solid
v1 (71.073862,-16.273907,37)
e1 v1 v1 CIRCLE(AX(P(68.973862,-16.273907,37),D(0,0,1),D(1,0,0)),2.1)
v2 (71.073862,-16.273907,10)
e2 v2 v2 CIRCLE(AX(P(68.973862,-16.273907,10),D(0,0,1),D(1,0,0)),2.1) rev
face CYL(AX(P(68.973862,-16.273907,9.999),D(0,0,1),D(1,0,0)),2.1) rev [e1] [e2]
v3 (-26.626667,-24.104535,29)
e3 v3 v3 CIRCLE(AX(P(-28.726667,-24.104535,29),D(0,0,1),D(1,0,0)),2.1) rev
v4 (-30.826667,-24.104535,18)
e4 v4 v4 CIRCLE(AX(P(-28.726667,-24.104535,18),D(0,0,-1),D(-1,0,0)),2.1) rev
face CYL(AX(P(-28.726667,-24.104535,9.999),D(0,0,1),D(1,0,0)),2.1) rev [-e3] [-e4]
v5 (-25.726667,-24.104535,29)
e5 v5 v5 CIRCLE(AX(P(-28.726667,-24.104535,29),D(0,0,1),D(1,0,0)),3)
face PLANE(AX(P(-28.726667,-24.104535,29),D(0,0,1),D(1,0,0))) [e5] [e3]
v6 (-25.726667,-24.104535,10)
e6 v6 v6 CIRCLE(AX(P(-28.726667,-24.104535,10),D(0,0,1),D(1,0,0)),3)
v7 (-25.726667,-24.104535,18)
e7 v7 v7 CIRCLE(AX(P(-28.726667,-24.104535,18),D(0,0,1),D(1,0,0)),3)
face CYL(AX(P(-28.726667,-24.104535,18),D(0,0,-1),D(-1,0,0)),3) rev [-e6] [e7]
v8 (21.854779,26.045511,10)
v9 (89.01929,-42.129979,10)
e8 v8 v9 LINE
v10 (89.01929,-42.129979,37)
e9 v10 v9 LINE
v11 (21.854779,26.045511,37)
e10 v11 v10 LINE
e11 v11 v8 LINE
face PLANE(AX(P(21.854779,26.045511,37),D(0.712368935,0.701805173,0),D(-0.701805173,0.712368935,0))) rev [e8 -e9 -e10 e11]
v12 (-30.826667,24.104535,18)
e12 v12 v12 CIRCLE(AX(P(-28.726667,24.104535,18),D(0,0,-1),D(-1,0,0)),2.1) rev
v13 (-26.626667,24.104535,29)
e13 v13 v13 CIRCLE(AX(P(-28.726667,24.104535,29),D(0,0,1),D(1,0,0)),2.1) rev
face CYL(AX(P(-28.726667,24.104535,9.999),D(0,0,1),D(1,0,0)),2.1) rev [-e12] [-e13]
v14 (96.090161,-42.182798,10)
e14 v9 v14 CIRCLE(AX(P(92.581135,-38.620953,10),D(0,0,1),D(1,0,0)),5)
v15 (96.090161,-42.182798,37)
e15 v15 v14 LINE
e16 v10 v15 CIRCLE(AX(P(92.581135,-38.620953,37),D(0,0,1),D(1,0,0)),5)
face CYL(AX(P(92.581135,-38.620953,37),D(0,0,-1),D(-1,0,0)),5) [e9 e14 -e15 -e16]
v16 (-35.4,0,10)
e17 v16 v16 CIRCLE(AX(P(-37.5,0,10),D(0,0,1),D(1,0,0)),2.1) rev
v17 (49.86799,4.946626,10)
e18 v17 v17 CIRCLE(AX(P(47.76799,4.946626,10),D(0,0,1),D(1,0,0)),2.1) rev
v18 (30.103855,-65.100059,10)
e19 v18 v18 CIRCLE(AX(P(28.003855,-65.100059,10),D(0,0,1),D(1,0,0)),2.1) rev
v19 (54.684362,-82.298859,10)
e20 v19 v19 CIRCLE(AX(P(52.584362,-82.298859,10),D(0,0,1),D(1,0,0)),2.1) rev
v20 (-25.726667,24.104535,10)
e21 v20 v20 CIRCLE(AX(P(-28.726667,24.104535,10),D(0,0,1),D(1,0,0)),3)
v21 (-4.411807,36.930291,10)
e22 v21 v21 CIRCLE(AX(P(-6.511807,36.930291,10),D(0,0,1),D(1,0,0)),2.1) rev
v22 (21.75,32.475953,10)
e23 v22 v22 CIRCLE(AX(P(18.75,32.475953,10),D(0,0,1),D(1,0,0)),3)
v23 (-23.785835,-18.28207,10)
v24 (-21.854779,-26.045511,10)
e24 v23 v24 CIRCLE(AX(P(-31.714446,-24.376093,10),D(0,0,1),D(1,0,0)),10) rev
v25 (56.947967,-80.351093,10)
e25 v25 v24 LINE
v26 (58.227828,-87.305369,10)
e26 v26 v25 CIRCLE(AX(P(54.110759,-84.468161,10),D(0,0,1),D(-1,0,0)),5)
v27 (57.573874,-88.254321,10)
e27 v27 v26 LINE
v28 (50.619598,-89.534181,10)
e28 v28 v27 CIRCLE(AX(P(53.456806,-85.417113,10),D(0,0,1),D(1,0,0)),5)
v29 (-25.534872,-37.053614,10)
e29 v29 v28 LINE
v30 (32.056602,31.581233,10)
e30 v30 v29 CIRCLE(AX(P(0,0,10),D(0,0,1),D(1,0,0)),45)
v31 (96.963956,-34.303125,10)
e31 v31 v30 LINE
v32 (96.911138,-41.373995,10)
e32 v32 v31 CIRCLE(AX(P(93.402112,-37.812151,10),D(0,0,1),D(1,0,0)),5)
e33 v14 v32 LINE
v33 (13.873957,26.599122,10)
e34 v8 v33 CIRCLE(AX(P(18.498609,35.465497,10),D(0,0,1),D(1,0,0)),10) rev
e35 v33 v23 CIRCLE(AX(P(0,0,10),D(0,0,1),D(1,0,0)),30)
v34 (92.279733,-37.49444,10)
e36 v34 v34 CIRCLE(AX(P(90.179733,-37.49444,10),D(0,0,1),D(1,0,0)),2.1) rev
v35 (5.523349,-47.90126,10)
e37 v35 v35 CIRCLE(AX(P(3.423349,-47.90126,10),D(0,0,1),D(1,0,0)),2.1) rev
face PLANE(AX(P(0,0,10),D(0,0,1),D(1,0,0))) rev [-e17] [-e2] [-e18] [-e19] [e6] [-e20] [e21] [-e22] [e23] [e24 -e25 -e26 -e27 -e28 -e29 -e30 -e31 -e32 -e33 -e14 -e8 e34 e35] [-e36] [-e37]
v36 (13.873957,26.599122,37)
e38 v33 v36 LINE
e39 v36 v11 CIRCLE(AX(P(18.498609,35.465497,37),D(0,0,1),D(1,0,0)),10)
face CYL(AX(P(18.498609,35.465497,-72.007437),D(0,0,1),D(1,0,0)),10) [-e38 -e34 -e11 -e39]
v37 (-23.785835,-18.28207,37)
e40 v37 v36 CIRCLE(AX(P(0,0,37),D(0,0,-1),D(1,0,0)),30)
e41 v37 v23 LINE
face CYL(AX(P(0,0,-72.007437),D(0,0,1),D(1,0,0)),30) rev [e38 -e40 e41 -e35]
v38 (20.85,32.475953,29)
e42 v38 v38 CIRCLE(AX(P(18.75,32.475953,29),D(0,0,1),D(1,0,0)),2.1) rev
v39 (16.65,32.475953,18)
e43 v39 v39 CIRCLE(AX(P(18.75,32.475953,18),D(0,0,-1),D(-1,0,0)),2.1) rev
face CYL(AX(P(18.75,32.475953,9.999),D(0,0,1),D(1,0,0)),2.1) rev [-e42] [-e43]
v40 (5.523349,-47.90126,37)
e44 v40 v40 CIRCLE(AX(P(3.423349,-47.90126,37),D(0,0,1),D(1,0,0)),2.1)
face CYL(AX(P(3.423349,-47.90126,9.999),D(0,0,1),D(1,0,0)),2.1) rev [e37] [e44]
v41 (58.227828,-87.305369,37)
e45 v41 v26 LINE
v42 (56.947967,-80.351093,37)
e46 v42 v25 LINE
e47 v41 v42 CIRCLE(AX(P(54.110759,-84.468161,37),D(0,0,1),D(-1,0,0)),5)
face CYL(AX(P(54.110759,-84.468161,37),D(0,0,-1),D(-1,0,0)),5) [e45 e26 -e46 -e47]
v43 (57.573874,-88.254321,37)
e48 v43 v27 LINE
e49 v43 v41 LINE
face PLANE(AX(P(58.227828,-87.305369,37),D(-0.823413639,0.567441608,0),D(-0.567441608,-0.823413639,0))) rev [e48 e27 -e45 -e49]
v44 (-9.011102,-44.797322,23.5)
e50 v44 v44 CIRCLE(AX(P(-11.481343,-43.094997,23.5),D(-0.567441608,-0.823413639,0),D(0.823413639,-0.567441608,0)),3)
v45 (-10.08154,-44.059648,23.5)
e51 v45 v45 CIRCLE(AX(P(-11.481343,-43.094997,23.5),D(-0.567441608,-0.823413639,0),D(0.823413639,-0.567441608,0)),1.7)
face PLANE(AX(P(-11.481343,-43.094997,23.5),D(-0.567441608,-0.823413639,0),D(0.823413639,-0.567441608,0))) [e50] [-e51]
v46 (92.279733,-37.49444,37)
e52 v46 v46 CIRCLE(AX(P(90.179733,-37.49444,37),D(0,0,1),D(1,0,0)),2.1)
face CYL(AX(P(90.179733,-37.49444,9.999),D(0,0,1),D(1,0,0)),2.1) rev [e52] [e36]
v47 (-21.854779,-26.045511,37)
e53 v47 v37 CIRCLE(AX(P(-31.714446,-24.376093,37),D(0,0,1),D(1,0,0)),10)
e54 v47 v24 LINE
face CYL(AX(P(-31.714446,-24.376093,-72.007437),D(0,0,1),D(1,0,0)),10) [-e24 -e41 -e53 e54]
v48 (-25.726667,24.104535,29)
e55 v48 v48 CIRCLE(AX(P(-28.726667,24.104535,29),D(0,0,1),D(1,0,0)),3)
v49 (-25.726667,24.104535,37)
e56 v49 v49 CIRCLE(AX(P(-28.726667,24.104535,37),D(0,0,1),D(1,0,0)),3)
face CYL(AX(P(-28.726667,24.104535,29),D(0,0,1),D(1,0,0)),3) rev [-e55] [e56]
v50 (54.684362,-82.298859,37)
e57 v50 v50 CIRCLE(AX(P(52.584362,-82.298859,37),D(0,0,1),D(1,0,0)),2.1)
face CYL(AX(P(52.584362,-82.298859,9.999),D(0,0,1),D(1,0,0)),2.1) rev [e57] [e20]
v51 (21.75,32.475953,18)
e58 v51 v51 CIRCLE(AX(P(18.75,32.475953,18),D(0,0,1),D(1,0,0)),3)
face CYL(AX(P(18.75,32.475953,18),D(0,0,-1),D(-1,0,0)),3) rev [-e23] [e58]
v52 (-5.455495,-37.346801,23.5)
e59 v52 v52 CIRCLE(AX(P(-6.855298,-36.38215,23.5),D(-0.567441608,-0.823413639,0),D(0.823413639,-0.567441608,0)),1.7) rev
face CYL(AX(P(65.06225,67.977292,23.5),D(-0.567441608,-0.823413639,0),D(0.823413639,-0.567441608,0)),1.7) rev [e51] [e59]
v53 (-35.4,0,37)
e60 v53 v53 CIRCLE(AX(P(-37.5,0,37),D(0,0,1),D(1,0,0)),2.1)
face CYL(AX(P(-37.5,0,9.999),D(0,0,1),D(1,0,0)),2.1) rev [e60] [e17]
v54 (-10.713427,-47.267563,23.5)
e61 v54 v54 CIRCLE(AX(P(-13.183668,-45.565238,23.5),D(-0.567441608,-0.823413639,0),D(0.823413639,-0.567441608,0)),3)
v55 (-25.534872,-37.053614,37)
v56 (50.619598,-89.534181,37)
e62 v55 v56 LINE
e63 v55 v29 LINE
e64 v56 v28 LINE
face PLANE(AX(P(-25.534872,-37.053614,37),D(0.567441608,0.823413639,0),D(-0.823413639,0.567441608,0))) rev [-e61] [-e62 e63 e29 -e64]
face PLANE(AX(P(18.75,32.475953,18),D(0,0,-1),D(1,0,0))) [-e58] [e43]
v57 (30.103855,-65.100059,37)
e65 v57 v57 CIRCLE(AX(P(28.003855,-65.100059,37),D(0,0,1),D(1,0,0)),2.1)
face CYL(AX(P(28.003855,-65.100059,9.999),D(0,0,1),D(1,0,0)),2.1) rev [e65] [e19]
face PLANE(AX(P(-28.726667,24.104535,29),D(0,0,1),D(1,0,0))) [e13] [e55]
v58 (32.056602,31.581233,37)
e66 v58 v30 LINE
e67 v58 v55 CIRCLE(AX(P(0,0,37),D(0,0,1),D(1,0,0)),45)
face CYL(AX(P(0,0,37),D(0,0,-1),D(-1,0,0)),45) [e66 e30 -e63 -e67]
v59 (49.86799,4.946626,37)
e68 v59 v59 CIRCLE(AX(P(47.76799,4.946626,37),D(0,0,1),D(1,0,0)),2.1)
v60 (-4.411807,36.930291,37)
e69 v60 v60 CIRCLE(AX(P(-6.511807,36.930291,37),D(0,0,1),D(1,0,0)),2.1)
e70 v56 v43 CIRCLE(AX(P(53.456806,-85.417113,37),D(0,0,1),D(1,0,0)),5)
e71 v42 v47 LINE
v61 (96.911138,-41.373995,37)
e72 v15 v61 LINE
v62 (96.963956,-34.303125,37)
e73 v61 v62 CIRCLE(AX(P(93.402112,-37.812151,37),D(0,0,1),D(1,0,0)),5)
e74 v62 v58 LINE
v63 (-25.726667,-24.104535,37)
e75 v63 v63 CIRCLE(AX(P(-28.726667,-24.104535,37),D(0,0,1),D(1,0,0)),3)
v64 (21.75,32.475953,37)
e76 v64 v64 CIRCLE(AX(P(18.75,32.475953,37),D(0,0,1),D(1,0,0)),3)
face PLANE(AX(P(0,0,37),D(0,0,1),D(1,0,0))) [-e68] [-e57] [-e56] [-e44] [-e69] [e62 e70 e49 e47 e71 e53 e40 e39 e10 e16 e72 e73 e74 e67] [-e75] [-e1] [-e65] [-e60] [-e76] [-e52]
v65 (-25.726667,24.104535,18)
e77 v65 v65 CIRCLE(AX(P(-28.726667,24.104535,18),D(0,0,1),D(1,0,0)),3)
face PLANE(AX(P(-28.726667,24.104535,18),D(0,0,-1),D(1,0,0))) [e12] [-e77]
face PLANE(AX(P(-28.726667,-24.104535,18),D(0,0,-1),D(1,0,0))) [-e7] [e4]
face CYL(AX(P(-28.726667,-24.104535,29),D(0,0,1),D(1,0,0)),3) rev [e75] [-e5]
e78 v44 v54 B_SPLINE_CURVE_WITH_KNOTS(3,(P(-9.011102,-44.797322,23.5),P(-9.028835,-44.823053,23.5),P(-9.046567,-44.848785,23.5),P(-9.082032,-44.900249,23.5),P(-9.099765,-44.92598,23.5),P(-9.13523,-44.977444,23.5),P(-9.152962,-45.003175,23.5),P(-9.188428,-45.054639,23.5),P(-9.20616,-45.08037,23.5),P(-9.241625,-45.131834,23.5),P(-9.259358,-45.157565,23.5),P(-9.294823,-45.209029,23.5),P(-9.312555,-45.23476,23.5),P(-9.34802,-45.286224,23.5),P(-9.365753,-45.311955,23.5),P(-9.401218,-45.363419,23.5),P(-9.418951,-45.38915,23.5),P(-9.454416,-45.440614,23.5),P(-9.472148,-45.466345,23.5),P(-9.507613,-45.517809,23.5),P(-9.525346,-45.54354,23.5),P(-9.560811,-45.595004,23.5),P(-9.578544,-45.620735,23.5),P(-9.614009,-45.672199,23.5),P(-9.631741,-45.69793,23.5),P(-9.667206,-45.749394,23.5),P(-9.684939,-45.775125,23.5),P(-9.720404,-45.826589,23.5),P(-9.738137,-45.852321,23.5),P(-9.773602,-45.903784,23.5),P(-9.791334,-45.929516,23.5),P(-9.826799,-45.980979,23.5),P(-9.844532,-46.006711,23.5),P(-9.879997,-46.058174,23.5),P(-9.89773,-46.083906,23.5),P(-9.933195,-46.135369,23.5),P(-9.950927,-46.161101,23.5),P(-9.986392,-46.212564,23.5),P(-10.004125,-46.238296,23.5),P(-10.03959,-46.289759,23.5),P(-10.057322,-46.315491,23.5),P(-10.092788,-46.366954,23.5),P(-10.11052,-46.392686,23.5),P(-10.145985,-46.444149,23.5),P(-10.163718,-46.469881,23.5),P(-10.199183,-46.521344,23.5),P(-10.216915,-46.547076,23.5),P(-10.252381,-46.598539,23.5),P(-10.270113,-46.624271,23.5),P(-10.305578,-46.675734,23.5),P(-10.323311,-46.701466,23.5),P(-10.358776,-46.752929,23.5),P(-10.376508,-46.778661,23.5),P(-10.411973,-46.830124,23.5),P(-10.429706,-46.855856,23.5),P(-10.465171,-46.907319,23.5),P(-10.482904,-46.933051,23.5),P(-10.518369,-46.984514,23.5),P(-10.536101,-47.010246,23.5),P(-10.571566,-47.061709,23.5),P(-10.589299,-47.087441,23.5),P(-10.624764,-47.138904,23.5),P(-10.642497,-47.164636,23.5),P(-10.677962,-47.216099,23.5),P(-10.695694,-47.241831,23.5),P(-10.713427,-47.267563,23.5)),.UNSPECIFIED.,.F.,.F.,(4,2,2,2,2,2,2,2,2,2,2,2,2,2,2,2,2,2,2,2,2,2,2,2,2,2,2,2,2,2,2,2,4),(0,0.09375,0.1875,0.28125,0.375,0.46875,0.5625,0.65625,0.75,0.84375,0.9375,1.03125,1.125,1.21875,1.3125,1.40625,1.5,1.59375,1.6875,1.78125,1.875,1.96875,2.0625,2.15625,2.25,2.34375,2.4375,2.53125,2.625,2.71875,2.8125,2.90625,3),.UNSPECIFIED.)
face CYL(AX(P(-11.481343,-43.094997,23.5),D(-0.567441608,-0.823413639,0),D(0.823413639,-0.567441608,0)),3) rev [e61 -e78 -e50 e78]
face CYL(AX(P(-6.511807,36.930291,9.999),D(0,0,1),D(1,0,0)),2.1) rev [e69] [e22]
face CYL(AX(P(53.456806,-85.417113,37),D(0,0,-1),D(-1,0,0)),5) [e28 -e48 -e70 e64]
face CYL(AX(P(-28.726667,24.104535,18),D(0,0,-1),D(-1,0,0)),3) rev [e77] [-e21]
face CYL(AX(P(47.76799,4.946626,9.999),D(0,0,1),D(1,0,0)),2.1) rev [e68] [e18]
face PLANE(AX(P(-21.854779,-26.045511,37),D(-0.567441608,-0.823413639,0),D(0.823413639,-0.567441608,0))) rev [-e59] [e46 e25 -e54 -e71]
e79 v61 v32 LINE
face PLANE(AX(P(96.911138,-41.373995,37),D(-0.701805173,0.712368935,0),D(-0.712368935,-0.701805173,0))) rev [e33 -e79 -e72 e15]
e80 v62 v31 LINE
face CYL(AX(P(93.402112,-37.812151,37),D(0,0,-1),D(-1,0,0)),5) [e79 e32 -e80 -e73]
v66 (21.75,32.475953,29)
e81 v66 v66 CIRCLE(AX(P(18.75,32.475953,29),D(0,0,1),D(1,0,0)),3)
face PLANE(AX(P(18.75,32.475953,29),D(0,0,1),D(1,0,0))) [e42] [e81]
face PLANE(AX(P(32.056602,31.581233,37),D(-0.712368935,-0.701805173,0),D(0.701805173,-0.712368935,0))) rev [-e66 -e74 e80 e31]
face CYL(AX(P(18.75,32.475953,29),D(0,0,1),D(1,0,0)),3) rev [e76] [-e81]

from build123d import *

# Parameters (mm, degrees)
SKETCH1_R           = 1.6
BOSS_EXTRUDE1_DEPTH = 27
CUT_EXTRUDE1_REACH  = 138.335
SKETCH2_R           = 2.1
CUT_EXTRUDE2_REACH  = 155.174
SKETCH3_R           = 1.7
SKETCH3_3_R         = 3
SKETCH3_3_R_2       = 1.7
CUT_EXTRUDE3_DEPTH  = 3
SKETCH4_R           = 3
CUT_EXTRUDE4_DEPTH  = 8
BOSS_EXTRUDE2_START = -27
BOSS_EXTRUDE2_DEPTH = 27
FILLET1_R           = 10


with BuildPart() as part:
    # Sketch1 → Boss-Extrude1 (new body)
    with BuildSketch(Plane.XY.offset(10)):
        with BuildLine():
            Line((-25.534872354, -37.053613776), (50.619597549, -89.534180987))
            ThreePointArc((50.619597549, -89.534180987), (54.361803385, -90.334528675), (57.573873786, -88.254320829))
            Line((57.573873786, -88.254320829), (58.227827632, -87.305369414))
            ThreePointArc((58.227827632, -87.305369414), (59.02817532, -83.563163578), (56.947967474, -80.351093178))
            Line((56.947967474, -80.351093178), (-21.854778729, -26.045511066))
            ThreePointArc((-21.854778729, -26.045511066), (-26.045511066, 21.854778729), (21.854778729, 26.045511066))
            Line((21.854778729, 26.045511066), (89.019290298, -42.129978983))
            ThreePointArc((89.019290298, -42.129978983), (92.543786433, -43.620813626), (96.090160837, -42.182797794))
            Line((96.090160837, -42.182797794), (96.911137653, -41.373995292))
            ThreePointArc((96.911137653, -41.373995292), (98.401972296, -37.849499157), (96.963956464, -34.303124754))
            Line((96.963956464, -34.303124754), (32.056602073, 31.581232775))
            ThreePointArc((32.056602073, 31.581232775), (-34.47199994, 28.925442436), (-25.534872354, -37.053613776))
        make_face()
        with Locations((90.17973297, -37.494440018)):
            Circle(SKETCH1_R, mode=Mode.SUBTRACT)
        with Locations((68.973861607, -16.273907044)):
            Circle(SKETCH1_R, mode=Mode.SUBTRACT)
        with Locations((47.767990244, 4.946625931)):
            Circle(SKETCH1_R, mode=Mode.SUBTRACT)
        with Locations((18.75, 32.475952642)):
            Circle(SKETCH1_R, mode=Mode.SUBTRACT)
        with Locations((-6.511806663, 36.930290738)):
            Circle(SKETCH1_R, mode=Mode.SUBTRACT)
        with Locations((-28.726666617, 24.104535363)):
            Circle(SKETCH1_R, mode=Mode.SUBTRACT)
        with Locations((-37.5, 0)):
            Circle(SKETCH1_R, mode=Mode.SUBTRACT)
        with Locations((-28.726666617, -24.104535363)):
            Circle(SKETCH1_R, mode=Mode.SUBTRACT)
        with Locations((3.423348889, -47.901259716)):
            Circle(SKETCH1_R, mode=Mode.SUBTRACT)
        with Locations((28.003855203, -65.100059364)):
            Circle(SKETCH1_R, mode=Mode.SUBTRACT)
        with Locations((52.584361518, -82.298859012)):
            Circle(SKETCH1_R, mode=Mode.SUBTRACT)
    extrude(amount=BOSS_EXTRUDE1_DEPTH)

    # Sketch2 → Cut-Extrude1 (cut, up to next)
    with BuildSketch(Plane.XY.offset(37), mode=Mode.PRIVATE) as cut_extrude1_sk1:
        with Locations((52.584361518, -82.298859012)):
            Circle(SKETCH2_R)
    cut_extrude1_tool1 = extrude(cut_extrude1_sk1.sketch, amount=-CUT_EXTRUDE1_REACH, mode=Mode.PRIVATE) & part.part
    # Sketch2 → Cut-Extrude1 (cut, up to next)
    with BuildSketch(Plane.XY.offset(37), mode=Mode.PRIVATE) as cut_extrude1_sk2:
        with Locations((28.003855203, -65.100059364)):
            Circle(SKETCH2_R)
    cut_extrude1_tool2 = extrude(cut_extrude1_sk2.sketch, amount=-CUT_EXTRUDE1_REACH, mode=Mode.PRIVATE) & part.part
    # Sketch2 → Cut-Extrude1 (cut, up to next)
    with BuildSketch(Plane.XY.offset(37), mode=Mode.PRIVATE) as cut_extrude1_sk3:
        with Locations((3.423348889, -47.901259716)):
            Circle(SKETCH2_R)
    cut_extrude1_tool3 = extrude(cut_extrude1_sk3.sketch, amount=-CUT_EXTRUDE1_REACH, mode=Mode.PRIVATE) & part.part
    # Sketch2 → Cut-Extrude1 (cut, up to next)
    with BuildSketch(Plane.XY.offset(37), mode=Mode.PRIVATE) as cut_extrude1_sk4:
        with Locations((-28.726666617, -24.104535363)):
            Circle(SKETCH2_R)
    cut_extrude1_tool4 = extrude(cut_extrude1_sk4.sketch, amount=-CUT_EXTRUDE1_REACH, mode=Mode.PRIVATE) & part.part
    # Sketch2 → Cut-Extrude1 (cut, up to next)
    with BuildSketch(Plane.XY.offset(37), mode=Mode.PRIVATE) as cut_extrude1_sk5:
        with Locations((-37.5, 0)):
            Circle(SKETCH2_R)
    cut_extrude1_tool5 = extrude(cut_extrude1_sk5.sketch, amount=-CUT_EXTRUDE1_REACH, mode=Mode.PRIVATE) & part.part
    # Sketch2 → Cut-Extrude1 (cut, up to next)
    with BuildSketch(Plane.XY.offset(37), mode=Mode.PRIVATE) as cut_extrude1_sk6:
        with Locations((-28.726666617, 24.104535363)):
            Circle(SKETCH2_R)
    cut_extrude1_tool6 = extrude(cut_extrude1_sk6.sketch, amount=-CUT_EXTRUDE1_REACH, mode=Mode.PRIVATE) & part.part
    # Sketch2 → Cut-Extrude1 (cut, up to next)
    with BuildSketch(Plane.XY.offset(37), mode=Mode.PRIVATE) as cut_extrude1_sk7:
        with Locations((-6.511806663, 36.930290738)):
            Circle(SKETCH2_R)
    cut_extrude1_tool7 = extrude(cut_extrude1_sk7.sketch, amount=-CUT_EXTRUDE1_REACH, mode=Mode.PRIVATE) & part.part
    # Sketch2 → Cut-Extrude1 (cut, up to next)
    with BuildSketch(Plane.XY.offset(37), mode=Mode.PRIVATE) as cut_extrude1_sk8:
        with Locations((18.75, 32.475952642)):
            Circle(SKETCH2_R)
    cut_extrude1_tool8 = extrude(cut_extrude1_sk8.sketch, amount=-CUT_EXTRUDE1_REACH, mode=Mode.PRIVATE) & part.part
    # Sketch2 → Cut-Extrude1 (cut, up to next)
    with BuildSketch(Plane.XY.offset(37), mode=Mode.PRIVATE) as cut_extrude1_sk9:
        with Locations((47.767990244, 4.946625931)):
            Circle(SKETCH2_R)
    cut_extrude1_tool9 = extrude(cut_extrude1_sk9.sketch, amount=-CUT_EXTRUDE1_REACH, mode=Mode.PRIVATE) & part.part
    # Sketch2 → Cut-Extrude1 (cut, up to next)
    with BuildSketch(Plane.XY.offset(37), mode=Mode.PRIVATE) as cut_extrude1_sk10:
        with Locations((68.973861607, -16.273907044)):
            Circle(SKETCH2_R)
    cut_extrude1_tool10 = extrude(cut_extrude1_sk10.sketch, amount=-CUT_EXTRUDE1_REACH, mode=Mode.PRIVATE) & part.part
    # Sketch2 → Cut-Extrude1 (cut, up to next)
    with BuildSketch(Plane.XY.offset(37), mode=Mode.PRIVATE) as cut_extrude1_sk11:
        with Locations((90.17973297, -37.494440018)):
            Circle(SKETCH2_R)
    cut_extrude1_tool11 = extrude(cut_extrude1_sk11.sketch, amount=-CUT_EXTRUDE1_REACH, mode=Mode.PRIVATE) & part.part
    add(cut_extrude1_tool1.solids().sort_by_distance((52.584362, -82.298859, 37))[0], mode=Mode.SUBTRACT)
    add(cut_extrude1_tool2.solids().sort_by_distance((28.003855, -65.100059, 37))[0], mode=Mode.SUBTRACT)
    add(cut_extrude1_tool3.solids().sort_by_distance((3.423349, -47.90126, 37))[0], mode=Mode.SUBTRACT)
    add(cut_extrude1_tool4.solids().sort_by_distance((-28.726667, -24.104535, 37))[0], mode=Mode.SUBTRACT)
    add(cut_extrude1_tool5.solids().sort_by_distance((-37.5, 0, 37))[0], mode=Mode.SUBTRACT)
    add(cut_extrude1_tool6.solids().sort_by_distance((-28.726667, 24.104535, 37))[0], mode=Mode.SUBTRACT)
    add(cut_extrude1_tool7.solids().sort_by_distance((-6.511807, 36.930291, 37))[0], mode=Mode.SUBTRACT)
    add(cut_extrude1_tool8.solids().sort_by_distance((18.75, 32.475953, 37))[0], mode=Mode.SUBTRACT)
    add(cut_extrude1_tool9.solids().sort_by_distance((47.76799, 4.946626, 37))[0], mode=Mode.SUBTRACT)
    add(cut_extrude1_tool10.solids().sort_by_distance((68.973862, -16.273907, 37))[0], mode=Mode.SUBTRACT)
    add(cut_extrude1_tool11.solids().sort_by_distance((90.179733, -37.49444, 37))[0], mode=Mode.SUBTRACT)

    # Sketch3 → Cut-Extrude2 (cut, up to next)
    with BuildSketch(Plane(origin=(-25.534872354, -37.053613776, 0), x_dir=(0.823413639467006, -0.567441607867893, 0), z_dir=(-0.5674416078678929, -0.8234136394670059, 0)), mode=Mode.PRIVATE) as cut_extrude2_sk1:
        with Locations((15, 23.5)):
            Circle(SKETCH3_R)
    cut_extrude2_tool1 = extrude(cut_extrude2_sk1.sketch, amount=-CUT_EXTRUDE2_REACH, mode=Mode.PRIVATE) & part.part
    add(cut_extrude2_tool1.solids().sort_by_distance((-13.183668, -45.565238, 23.5))[0], mode=Mode.SUBTRACT)

    # Sketch3<3> → Cut-Extrude3 (cut)
    with BuildSketch(Plane(origin=(-25.534872354, -37.053613776, 0), x_dir=(0.823413639467006, -0.567441607867893, 0), z_dir=(-0.5674416078678929, -0.8234136394670059, 0))):
        with Locations((15, 23.5)):
            Circle(SKETCH3_3_R)
        with Locations((15, 23.5)):
            Circle(SKETCH3_3_R_2, mode=Mode.SUBTRACT)
    extrude(amount=-CUT_EXTRUDE3_DEPTH, mode=Mode.SUBTRACT)

    # Sketch4 → Cut-Extrude4 (cut)
    with BuildSketch(Plane.XY.offset(37)):
        with Locations((18.75, 32.475952642)):
            Circle(SKETCH4_R)
        with Locations((-28.726666617, 24.104535363)):
            Circle(SKETCH4_R)
        with Locations((-28.726666617, -24.104535363)):
            Circle(SKETCH4_R)
    cut_extrude4 = extrude(amount=-CUT_EXTRUDE4_DEPTH, mode=Mode.SUBTRACT)

    # Sketch5 → Boss-Extrude2 (add)
    with BuildSketch(Plane.XY.offset(37).offset(BOSS_EXTRUDE2_START)):
        with BuildLine():
            Line((-19.283628291, -22.981333294), (-21.854778729, -26.045511066))
            ThreePointArc((-21.854778729, -26.045511066), (-26.045511066, 21.854778729), (21.854778729, 26.045511066))
            Line((21.854778729, 26.045511066), (19.283628291, 22.981333294))
            ThreePointArc((19.283628291, 22.981333294), (-22.981333294, 19.283628291), (-19.283628291, -22.981333294))
        make_face()
    extrude(amount=BOSS_EXTRUDE2_DEPTH)

    # Fillet1
    # the kernel refuses this fillet: 10 mm, written as the material it takes off along each edge
    with BuildSketch(Plane(origin=(-19.283628291, -22.981333294, -6.269784336), x_dir=(-0.6427876096873701, -0.7660444431182809, 0), z_dir=(0, 0, 1))) as fillet1_piece_1:
        with BuildLine():
            CenterArc((9.058823529, -8.626024838), FILLET1_R, 120.389942449, 47.156356956)
            Line((-0.705882353, -6.469518628), (-0.901176471, -6.426388504))
            ThreePointArc((-0.901176471, -6.426388504), (-0.375812744, -3.232263822), (-0.2, 0))
            Line((-0.2, 0), (0, 0.2))
            ThreePointArc((0, 0.2), (2, 0.2), (3.898823529, 0.172520497))
            Line((3.898823529, 0.172520497), (4, 0))
        make_face()
    extrude(amount=59.539568673, mode=Mode.SUBTRACT)
    with BuildSketch(Plane(origin=(19.283628291, 22.981333294, -6.269784336), x_dir=(0.6427876096857099, 0.7660444431196739, 0), z_dir=(0, 0, 1))) as fillet1_piece_2:
        with BuildLine():
            CenterArc((9.058823529, 8.626024838), FILLET1_R, 192.453700594, 47.156356956)
            Line((-0.705882353, 6.469518628), (-0.901176471, 6.426388504))
            ThreePointArc((-0.901176471, 6.426388504), (-0.375812744, 3.232263822), (-0.2, 0))
            Line((-0.2, 0), (0, -0.2))
            ThreePointArc((0, -0.2), (2, -0.2), (3.898823529, -0.172520497))
            Line((3.898823529, -0.172520497), (4, 0))
        make_face()
    extrude(amount=59.539568673, mode=Mode.SUBTRACT)

    # Mirror1: Cut-Extrude4 across plane
    add(cut_extrude4.mirror(Plane.XY.offset(23.5)), mode=Mode.SUBTRACT)


solid = part.part
